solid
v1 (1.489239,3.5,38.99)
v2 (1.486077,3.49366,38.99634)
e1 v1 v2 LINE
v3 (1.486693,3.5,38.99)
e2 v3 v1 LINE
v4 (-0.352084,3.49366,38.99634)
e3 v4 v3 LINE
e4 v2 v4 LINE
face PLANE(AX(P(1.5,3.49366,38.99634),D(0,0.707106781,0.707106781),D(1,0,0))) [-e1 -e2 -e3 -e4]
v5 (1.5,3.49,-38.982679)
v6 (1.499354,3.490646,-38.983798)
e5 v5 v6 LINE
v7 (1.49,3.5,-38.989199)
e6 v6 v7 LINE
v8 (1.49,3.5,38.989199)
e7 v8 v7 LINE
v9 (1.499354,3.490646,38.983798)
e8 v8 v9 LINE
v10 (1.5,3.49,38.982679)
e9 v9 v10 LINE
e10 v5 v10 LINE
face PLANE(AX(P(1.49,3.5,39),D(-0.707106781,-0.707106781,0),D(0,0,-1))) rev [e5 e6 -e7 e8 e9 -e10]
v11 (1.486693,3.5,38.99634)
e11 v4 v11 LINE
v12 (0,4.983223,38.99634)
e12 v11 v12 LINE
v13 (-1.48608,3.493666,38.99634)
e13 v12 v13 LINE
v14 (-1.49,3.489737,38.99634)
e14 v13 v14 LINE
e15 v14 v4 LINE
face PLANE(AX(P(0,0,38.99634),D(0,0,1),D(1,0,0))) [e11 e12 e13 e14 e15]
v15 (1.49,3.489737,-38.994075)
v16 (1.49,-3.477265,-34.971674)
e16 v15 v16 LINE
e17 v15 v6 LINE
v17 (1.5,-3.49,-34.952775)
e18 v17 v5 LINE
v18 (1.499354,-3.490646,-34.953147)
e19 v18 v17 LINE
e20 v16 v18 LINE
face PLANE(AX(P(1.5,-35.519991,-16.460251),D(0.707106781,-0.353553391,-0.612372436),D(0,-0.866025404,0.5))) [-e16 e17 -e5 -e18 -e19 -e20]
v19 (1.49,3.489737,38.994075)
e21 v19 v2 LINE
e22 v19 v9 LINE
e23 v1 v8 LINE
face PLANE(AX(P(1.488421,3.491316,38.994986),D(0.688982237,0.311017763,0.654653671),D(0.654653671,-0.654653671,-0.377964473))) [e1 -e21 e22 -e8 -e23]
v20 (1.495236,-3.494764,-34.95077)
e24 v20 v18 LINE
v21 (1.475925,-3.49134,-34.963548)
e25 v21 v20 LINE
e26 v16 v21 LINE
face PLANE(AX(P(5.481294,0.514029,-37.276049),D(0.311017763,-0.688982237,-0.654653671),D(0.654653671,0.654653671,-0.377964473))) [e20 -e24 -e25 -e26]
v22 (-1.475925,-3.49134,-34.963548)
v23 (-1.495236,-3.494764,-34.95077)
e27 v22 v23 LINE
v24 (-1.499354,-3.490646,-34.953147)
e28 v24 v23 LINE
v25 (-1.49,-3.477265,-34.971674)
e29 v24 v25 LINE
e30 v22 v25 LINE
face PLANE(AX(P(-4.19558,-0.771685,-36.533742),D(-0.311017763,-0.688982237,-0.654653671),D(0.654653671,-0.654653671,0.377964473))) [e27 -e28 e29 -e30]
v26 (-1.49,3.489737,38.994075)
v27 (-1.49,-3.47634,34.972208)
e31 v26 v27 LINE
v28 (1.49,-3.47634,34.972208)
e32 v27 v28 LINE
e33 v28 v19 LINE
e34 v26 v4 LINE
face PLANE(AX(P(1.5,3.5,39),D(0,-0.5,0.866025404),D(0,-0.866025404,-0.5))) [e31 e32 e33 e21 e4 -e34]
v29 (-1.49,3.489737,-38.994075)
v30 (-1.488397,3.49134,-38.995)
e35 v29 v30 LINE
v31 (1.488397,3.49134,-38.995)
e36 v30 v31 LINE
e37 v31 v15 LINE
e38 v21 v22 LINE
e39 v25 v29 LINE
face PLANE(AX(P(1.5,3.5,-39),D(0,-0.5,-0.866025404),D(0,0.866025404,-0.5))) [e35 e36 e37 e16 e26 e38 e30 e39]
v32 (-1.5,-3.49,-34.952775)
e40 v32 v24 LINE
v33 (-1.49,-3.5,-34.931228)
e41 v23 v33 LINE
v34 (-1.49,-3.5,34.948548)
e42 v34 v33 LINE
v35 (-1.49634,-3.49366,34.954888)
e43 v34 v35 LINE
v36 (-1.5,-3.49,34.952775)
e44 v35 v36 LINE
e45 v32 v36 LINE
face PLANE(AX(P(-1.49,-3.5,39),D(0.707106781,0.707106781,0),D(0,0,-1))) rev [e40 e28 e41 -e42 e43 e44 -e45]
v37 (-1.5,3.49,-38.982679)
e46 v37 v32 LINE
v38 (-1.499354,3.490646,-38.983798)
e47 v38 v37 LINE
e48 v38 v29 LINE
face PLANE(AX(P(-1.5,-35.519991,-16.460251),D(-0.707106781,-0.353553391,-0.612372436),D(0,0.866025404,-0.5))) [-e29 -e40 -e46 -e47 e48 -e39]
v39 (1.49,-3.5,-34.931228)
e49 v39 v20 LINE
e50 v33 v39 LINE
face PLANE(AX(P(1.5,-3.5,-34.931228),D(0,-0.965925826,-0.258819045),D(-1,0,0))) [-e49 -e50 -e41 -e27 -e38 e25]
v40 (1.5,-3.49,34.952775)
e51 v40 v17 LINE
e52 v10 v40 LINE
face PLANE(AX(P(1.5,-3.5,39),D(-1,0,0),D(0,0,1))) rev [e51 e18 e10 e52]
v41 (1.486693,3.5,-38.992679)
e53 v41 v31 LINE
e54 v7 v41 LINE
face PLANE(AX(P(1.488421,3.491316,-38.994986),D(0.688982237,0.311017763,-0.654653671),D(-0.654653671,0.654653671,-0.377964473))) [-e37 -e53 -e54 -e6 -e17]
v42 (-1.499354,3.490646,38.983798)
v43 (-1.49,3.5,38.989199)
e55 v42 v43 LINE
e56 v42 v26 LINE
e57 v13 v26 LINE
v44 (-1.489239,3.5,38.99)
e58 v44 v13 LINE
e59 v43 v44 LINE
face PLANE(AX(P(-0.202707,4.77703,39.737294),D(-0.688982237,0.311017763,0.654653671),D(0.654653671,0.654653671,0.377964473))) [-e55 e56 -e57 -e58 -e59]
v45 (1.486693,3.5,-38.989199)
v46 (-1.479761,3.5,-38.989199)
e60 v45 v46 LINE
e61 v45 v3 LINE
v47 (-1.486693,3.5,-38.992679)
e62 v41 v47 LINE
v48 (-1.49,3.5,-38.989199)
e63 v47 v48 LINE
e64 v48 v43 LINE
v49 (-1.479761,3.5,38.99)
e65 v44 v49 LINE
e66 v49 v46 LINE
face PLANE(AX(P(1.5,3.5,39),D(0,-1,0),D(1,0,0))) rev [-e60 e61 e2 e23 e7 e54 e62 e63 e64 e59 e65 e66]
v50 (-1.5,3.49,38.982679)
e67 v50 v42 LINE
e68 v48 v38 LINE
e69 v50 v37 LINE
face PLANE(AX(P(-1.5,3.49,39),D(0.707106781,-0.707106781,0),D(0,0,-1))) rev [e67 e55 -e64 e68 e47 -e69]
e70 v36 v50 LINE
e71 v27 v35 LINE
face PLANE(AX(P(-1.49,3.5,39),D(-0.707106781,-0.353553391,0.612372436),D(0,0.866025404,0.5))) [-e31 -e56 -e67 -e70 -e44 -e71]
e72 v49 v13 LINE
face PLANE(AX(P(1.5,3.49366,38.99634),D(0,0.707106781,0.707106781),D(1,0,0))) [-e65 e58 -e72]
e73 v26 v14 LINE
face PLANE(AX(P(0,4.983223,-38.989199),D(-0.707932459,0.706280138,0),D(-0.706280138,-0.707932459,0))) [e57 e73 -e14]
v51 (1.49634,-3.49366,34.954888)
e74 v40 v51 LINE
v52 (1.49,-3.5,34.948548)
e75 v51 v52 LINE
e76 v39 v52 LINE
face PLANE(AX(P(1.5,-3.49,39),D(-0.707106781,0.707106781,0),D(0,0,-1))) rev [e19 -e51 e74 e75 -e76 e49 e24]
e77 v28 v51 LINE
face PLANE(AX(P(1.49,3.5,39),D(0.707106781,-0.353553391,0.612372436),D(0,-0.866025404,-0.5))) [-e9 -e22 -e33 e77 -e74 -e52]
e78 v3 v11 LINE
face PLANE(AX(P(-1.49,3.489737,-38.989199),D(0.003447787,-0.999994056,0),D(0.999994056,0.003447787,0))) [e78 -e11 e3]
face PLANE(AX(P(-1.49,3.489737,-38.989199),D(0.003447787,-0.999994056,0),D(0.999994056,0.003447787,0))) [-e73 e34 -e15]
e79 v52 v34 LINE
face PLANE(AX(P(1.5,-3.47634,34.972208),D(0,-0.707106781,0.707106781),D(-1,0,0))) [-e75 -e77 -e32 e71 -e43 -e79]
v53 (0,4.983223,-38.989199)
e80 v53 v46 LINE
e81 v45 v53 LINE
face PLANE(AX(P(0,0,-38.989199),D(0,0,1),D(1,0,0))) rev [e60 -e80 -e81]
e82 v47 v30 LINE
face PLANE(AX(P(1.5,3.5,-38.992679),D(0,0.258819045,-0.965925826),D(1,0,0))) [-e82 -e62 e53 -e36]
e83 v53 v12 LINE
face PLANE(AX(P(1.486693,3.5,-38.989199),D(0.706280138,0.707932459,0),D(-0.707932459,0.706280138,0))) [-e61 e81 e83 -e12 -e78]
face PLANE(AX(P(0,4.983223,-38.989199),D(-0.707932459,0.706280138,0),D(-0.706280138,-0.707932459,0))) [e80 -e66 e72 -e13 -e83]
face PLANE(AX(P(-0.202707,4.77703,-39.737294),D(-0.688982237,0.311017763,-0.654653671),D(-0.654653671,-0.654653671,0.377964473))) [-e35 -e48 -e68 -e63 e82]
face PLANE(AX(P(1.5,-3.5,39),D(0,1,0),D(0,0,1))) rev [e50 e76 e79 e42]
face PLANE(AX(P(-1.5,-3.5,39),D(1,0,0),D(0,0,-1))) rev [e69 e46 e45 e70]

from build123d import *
from OCP.BRepFilletAPI import BRepFilletAPI_MakeChamfer

# Parameters (mm, degrees)
SKETCH1_W           = 3
SKETCH1_H           = 7
BOSS_EXTRUDE1_DEPTH = 39
DRAFT1_ANGLE        = -30
DRAFT2_ANGLE        = -30
CHAMFER1_SIZE       = 0.01
CHAMFER2_SIZE       = 0.01
CHAMFER2_SIZE_2     = 0.007320508
CHAMFER2_SIZE_3     = 0.027320508
CHAMFER2_SIZE_4     = 0.007758146
CHAMFER2_SIZE_5     = 0.017186236
BOSS_EXTRUDE2_START = 38.99634
BOSS_EXTRUDE2_DEPTH = 77.98554


with BuildPart() as part:
    # Sketch1 → Boss-Extrude1 (new, symmetric)
    with BuildSketch(Plane.XY):
        Rectangle(SKETCH1_W, SKETCH1_H)
    extrude(amount=BOSS_EXTRUDE1_DEPTH, both=True)

    # Draft1
    draft1_faces = [part.faces().sort_by_distance(p)[0] for p in [
        (0, 0, 39),
    ]]
    draft(draft1_faces, Plane(origin=(1.5, 3.5, 39), x_dir=(1, 0, 0), z_dir=(0, 1, 0)), DRAFT1_ANGLE)

    # Draft2
    draft2_faces = [part.faces().sort_by_distance(p)[0] for p in [
        (0, 0, -39),
    ]]
    draft(draft2_faces, Plane(origin=(1.5, 3.5, 39), x_dir=(1, 0, 0), z_dir=(0, 1, 0)), DRAFT2_ANGLE)

    # Chamfer1
    chamfer1_edges = [part.edges().sort_by_distance(p)[0] for p in [
        (-1.5, 3.5, 0),
        (1.5, 3.5, 0),
        (1.5, -3.5, 0),
        (-1.5, -3.5, 0),
    ]]
    chamfer(chamfer1_edges, length=CHAMFER1_SIZE)

    # Chamfer2
    chamfer2_edges_1 = [part.edges().sort_by_distance(p)[0] for p in [
        (0, 3.5, -39),
    ]]
    chamfer2_side_1 = [part.faces().sort_by_distance(p)[0] for p in [
        (0, 3.499873205, -38.999926795),
    ]]
    chamfer2_edges_2 = [part.edges().sort_by_distance(p)[0] for p in [
        (0, -3.5, -34.958548116),
    ]]
    chamfer2_side_2 = [part.faces().sort_by_distance(p)[0] for p in [
        (0, -3.5, -34.958348116),
    ]]
    chamfer2_edges_3 = [part.edges().sort_by_distance(p)[0] for p in [
        (1.495, 3.495, -38.997113249),
    ]]
    chamfer2_side_3 = [part.faces().sort_by_distance(p)[0] for p in [
        (1.494882708, 3.494912031, -38.99706246),
    ]]
    chamfer2_edges_4 = [part.edges().sort_by_distance(p)[0] for p in [
        (1.495, 3.495, 38.997113249),
    ]]
    chamfer2_side_4 = [part.faces().sort_by_distance(p)[0] for p in [
        (1.494882708, 3.494912031, 38.99706246),
    ]]
    chamfer2_edges_5 = [part.edges().sort_by_distance(p)[0] for p in [
        (-1.495, 3.495, -38.997113249),
    ]]
    chamfer2_side_5 = [part.faces().sort_by_distance(p)[0] for p in [
        (-1.494882708, 3.494912031, -38.99706246),
    ]]
    chamfer2_edges_6 = [part.edges().sort_by_distance(p)[0] for p in [
        (-1.495, 3.495, 38.997113249),
    ]]
    chamfer2_side_6 = [part.faces().sort_by_distance(p)[0] for p in [
        (-1.494882708, 3.494912031, 38.99706246),
    ]]
    chamfer2_edges_7 = [part.edges().sort_by_distance(p)[0] for p in [
        (0, 3.5, 39),
    ]]
    chamfer2_side_7 = [part.faces().sort_by_distance(p)[0] for p in [
        (0, 3.499873205, 38.999926795),
    ]]
    chamfer2_edges_8 = [part.edges().sort_by_distance(p)[0] for p in [
        (0, -3.5, 34.958548116),
    ]]
    chamfer2_side_8 = [part.faces().sort_by_distance(p)[0] for p in [
        (0, -3.5, 34.958348116),
    ]]
    chamfer2 = BRepFilletAPI_MakeChamfer(part.part.solid().wrapped)
    for e in chamfer2_edges_1:
        chamfer2.Add(CHAMFER2_SIZE, CHAMFER2_SIZE_2, e.wrapped, chamfer2_side_1[0].wrapped)
    for e in chamfer2_edges_2:
        chamfer2.Add(CHAMFER2_SIZE_3, CHAMFER2_SIZE, e.wrapped, chamfer2_side_2[0].wrapped)
    for e in chamfer2_edges_3:
        chamfer2.Add(CHAMFER2_SIZE_4, CHAMFER2_SIZE, e.wrapped, chamfer2_side_3[0].wrapped)
    for e in chamfer2_edges_4:
        chamfer2.Add(CHAMFER2_SIZE_4, CHAMFER2_SIZE, e.wrapped, chamfer2_side_4[0].wrapped)
    for e in chamfer2_edges_5:
        chamfer2.Add(CHAMFER2_SIZE_4, CHAMFER2_SIZE, e.wrapped, chamfer2_side_5[0].wrapped)
    for e in chamfer2_edges_6:
        chamfer2.Add(CHAMFER2_SIZE_4, CHAMFER2_SIZE, e.wrapped, chamfer2_side_6[0].wrapped)
    for e in chamfer2_edges_7:
        chamfer2.Add(CHAMFER2_SIZE_2, CHAMFER2_SIZE, e.wrapped, chamfer2_side_7[0].wrapped)
    for e in chamfer2_edges_8:
        chamfer2.Add(CHAMFER2_SIZE, CHAMFER2_SIZE_3, e.wrapped, chamfer2_side_8[0].wrapped)
    add(Compound.cast(chamfer2.Shape()), mode=Mode.REPLACE)
    chamfer2_2_edges_1 = [part.edges().sort_by_distance(p)[0] for p in [
        (1.499330127, -3.490669873, -34.963934867),
    ]]
    chamfer2_2_side_1 = [part.faces().sort_by_distance(p)[0] for p in [
        (1.499383579, -3.490616421, -34.963749703),
    ]]
    chamfer2_2_edges_2 = [part.edges().sort_by_distance(p)[0] for p in [
        (-1.499330127, -3.490669873, -34.963934867),
    ]]
    chamfer2_2_side_2 = [part.faces().sort_by_distance(p)[0] for p in [
        (-1.499383579, -3.490616421, -34.963749703),
    ]]
    chamfer2_2 = BRepFilletAPI_MakeChamfer(part.part.solid().wrapped)
    for e in chamfer2_2_edges_1:
        chamfer2_2.Add(CHAMFER2_SIZE, CHAMFER2_SIZE_5, e.wrapped, chamfer2_2_side_1[0].wrapped)
    for e in chamfer2_2_edges_2:
        chamfer2_2.Add(CHAMFER2_SIZE, CHAMFER2_SIZE_5, e.wrapped, chamfer2_2_side_2[0].wrapped)
    add(Compound.cast(chamfer2_2.Shape()), mode=Mode.REPLACE)
    chamfer2_3_edges = [part.edges().sort_by_distance(p)[0] for p in [
        (-1.5, 0.006236096, -36.982874469),
        (-1.5, 0.001698596, 36.980254743),
        (1.5, 0.006236096, -36.982874469),
        (1.5, 0.001698596, 36.980254743),
    ]]
    chamfer(chamfer2_3_edges, length=CHAMFER2_SIZE)

    # Sketch2 → Boss-Extrude2 (add)
    with BuildSketch(Plane.XY.offset(BOSS_EXTRUDE2_START)):
        Polygon((1.486692701, 3.5), (0, 4.983222747), (-1.49, 3.489736937), align=None)
    extrude(amount=-BOSS_EXTRUDE2_DEPTH)


solid = part.part
